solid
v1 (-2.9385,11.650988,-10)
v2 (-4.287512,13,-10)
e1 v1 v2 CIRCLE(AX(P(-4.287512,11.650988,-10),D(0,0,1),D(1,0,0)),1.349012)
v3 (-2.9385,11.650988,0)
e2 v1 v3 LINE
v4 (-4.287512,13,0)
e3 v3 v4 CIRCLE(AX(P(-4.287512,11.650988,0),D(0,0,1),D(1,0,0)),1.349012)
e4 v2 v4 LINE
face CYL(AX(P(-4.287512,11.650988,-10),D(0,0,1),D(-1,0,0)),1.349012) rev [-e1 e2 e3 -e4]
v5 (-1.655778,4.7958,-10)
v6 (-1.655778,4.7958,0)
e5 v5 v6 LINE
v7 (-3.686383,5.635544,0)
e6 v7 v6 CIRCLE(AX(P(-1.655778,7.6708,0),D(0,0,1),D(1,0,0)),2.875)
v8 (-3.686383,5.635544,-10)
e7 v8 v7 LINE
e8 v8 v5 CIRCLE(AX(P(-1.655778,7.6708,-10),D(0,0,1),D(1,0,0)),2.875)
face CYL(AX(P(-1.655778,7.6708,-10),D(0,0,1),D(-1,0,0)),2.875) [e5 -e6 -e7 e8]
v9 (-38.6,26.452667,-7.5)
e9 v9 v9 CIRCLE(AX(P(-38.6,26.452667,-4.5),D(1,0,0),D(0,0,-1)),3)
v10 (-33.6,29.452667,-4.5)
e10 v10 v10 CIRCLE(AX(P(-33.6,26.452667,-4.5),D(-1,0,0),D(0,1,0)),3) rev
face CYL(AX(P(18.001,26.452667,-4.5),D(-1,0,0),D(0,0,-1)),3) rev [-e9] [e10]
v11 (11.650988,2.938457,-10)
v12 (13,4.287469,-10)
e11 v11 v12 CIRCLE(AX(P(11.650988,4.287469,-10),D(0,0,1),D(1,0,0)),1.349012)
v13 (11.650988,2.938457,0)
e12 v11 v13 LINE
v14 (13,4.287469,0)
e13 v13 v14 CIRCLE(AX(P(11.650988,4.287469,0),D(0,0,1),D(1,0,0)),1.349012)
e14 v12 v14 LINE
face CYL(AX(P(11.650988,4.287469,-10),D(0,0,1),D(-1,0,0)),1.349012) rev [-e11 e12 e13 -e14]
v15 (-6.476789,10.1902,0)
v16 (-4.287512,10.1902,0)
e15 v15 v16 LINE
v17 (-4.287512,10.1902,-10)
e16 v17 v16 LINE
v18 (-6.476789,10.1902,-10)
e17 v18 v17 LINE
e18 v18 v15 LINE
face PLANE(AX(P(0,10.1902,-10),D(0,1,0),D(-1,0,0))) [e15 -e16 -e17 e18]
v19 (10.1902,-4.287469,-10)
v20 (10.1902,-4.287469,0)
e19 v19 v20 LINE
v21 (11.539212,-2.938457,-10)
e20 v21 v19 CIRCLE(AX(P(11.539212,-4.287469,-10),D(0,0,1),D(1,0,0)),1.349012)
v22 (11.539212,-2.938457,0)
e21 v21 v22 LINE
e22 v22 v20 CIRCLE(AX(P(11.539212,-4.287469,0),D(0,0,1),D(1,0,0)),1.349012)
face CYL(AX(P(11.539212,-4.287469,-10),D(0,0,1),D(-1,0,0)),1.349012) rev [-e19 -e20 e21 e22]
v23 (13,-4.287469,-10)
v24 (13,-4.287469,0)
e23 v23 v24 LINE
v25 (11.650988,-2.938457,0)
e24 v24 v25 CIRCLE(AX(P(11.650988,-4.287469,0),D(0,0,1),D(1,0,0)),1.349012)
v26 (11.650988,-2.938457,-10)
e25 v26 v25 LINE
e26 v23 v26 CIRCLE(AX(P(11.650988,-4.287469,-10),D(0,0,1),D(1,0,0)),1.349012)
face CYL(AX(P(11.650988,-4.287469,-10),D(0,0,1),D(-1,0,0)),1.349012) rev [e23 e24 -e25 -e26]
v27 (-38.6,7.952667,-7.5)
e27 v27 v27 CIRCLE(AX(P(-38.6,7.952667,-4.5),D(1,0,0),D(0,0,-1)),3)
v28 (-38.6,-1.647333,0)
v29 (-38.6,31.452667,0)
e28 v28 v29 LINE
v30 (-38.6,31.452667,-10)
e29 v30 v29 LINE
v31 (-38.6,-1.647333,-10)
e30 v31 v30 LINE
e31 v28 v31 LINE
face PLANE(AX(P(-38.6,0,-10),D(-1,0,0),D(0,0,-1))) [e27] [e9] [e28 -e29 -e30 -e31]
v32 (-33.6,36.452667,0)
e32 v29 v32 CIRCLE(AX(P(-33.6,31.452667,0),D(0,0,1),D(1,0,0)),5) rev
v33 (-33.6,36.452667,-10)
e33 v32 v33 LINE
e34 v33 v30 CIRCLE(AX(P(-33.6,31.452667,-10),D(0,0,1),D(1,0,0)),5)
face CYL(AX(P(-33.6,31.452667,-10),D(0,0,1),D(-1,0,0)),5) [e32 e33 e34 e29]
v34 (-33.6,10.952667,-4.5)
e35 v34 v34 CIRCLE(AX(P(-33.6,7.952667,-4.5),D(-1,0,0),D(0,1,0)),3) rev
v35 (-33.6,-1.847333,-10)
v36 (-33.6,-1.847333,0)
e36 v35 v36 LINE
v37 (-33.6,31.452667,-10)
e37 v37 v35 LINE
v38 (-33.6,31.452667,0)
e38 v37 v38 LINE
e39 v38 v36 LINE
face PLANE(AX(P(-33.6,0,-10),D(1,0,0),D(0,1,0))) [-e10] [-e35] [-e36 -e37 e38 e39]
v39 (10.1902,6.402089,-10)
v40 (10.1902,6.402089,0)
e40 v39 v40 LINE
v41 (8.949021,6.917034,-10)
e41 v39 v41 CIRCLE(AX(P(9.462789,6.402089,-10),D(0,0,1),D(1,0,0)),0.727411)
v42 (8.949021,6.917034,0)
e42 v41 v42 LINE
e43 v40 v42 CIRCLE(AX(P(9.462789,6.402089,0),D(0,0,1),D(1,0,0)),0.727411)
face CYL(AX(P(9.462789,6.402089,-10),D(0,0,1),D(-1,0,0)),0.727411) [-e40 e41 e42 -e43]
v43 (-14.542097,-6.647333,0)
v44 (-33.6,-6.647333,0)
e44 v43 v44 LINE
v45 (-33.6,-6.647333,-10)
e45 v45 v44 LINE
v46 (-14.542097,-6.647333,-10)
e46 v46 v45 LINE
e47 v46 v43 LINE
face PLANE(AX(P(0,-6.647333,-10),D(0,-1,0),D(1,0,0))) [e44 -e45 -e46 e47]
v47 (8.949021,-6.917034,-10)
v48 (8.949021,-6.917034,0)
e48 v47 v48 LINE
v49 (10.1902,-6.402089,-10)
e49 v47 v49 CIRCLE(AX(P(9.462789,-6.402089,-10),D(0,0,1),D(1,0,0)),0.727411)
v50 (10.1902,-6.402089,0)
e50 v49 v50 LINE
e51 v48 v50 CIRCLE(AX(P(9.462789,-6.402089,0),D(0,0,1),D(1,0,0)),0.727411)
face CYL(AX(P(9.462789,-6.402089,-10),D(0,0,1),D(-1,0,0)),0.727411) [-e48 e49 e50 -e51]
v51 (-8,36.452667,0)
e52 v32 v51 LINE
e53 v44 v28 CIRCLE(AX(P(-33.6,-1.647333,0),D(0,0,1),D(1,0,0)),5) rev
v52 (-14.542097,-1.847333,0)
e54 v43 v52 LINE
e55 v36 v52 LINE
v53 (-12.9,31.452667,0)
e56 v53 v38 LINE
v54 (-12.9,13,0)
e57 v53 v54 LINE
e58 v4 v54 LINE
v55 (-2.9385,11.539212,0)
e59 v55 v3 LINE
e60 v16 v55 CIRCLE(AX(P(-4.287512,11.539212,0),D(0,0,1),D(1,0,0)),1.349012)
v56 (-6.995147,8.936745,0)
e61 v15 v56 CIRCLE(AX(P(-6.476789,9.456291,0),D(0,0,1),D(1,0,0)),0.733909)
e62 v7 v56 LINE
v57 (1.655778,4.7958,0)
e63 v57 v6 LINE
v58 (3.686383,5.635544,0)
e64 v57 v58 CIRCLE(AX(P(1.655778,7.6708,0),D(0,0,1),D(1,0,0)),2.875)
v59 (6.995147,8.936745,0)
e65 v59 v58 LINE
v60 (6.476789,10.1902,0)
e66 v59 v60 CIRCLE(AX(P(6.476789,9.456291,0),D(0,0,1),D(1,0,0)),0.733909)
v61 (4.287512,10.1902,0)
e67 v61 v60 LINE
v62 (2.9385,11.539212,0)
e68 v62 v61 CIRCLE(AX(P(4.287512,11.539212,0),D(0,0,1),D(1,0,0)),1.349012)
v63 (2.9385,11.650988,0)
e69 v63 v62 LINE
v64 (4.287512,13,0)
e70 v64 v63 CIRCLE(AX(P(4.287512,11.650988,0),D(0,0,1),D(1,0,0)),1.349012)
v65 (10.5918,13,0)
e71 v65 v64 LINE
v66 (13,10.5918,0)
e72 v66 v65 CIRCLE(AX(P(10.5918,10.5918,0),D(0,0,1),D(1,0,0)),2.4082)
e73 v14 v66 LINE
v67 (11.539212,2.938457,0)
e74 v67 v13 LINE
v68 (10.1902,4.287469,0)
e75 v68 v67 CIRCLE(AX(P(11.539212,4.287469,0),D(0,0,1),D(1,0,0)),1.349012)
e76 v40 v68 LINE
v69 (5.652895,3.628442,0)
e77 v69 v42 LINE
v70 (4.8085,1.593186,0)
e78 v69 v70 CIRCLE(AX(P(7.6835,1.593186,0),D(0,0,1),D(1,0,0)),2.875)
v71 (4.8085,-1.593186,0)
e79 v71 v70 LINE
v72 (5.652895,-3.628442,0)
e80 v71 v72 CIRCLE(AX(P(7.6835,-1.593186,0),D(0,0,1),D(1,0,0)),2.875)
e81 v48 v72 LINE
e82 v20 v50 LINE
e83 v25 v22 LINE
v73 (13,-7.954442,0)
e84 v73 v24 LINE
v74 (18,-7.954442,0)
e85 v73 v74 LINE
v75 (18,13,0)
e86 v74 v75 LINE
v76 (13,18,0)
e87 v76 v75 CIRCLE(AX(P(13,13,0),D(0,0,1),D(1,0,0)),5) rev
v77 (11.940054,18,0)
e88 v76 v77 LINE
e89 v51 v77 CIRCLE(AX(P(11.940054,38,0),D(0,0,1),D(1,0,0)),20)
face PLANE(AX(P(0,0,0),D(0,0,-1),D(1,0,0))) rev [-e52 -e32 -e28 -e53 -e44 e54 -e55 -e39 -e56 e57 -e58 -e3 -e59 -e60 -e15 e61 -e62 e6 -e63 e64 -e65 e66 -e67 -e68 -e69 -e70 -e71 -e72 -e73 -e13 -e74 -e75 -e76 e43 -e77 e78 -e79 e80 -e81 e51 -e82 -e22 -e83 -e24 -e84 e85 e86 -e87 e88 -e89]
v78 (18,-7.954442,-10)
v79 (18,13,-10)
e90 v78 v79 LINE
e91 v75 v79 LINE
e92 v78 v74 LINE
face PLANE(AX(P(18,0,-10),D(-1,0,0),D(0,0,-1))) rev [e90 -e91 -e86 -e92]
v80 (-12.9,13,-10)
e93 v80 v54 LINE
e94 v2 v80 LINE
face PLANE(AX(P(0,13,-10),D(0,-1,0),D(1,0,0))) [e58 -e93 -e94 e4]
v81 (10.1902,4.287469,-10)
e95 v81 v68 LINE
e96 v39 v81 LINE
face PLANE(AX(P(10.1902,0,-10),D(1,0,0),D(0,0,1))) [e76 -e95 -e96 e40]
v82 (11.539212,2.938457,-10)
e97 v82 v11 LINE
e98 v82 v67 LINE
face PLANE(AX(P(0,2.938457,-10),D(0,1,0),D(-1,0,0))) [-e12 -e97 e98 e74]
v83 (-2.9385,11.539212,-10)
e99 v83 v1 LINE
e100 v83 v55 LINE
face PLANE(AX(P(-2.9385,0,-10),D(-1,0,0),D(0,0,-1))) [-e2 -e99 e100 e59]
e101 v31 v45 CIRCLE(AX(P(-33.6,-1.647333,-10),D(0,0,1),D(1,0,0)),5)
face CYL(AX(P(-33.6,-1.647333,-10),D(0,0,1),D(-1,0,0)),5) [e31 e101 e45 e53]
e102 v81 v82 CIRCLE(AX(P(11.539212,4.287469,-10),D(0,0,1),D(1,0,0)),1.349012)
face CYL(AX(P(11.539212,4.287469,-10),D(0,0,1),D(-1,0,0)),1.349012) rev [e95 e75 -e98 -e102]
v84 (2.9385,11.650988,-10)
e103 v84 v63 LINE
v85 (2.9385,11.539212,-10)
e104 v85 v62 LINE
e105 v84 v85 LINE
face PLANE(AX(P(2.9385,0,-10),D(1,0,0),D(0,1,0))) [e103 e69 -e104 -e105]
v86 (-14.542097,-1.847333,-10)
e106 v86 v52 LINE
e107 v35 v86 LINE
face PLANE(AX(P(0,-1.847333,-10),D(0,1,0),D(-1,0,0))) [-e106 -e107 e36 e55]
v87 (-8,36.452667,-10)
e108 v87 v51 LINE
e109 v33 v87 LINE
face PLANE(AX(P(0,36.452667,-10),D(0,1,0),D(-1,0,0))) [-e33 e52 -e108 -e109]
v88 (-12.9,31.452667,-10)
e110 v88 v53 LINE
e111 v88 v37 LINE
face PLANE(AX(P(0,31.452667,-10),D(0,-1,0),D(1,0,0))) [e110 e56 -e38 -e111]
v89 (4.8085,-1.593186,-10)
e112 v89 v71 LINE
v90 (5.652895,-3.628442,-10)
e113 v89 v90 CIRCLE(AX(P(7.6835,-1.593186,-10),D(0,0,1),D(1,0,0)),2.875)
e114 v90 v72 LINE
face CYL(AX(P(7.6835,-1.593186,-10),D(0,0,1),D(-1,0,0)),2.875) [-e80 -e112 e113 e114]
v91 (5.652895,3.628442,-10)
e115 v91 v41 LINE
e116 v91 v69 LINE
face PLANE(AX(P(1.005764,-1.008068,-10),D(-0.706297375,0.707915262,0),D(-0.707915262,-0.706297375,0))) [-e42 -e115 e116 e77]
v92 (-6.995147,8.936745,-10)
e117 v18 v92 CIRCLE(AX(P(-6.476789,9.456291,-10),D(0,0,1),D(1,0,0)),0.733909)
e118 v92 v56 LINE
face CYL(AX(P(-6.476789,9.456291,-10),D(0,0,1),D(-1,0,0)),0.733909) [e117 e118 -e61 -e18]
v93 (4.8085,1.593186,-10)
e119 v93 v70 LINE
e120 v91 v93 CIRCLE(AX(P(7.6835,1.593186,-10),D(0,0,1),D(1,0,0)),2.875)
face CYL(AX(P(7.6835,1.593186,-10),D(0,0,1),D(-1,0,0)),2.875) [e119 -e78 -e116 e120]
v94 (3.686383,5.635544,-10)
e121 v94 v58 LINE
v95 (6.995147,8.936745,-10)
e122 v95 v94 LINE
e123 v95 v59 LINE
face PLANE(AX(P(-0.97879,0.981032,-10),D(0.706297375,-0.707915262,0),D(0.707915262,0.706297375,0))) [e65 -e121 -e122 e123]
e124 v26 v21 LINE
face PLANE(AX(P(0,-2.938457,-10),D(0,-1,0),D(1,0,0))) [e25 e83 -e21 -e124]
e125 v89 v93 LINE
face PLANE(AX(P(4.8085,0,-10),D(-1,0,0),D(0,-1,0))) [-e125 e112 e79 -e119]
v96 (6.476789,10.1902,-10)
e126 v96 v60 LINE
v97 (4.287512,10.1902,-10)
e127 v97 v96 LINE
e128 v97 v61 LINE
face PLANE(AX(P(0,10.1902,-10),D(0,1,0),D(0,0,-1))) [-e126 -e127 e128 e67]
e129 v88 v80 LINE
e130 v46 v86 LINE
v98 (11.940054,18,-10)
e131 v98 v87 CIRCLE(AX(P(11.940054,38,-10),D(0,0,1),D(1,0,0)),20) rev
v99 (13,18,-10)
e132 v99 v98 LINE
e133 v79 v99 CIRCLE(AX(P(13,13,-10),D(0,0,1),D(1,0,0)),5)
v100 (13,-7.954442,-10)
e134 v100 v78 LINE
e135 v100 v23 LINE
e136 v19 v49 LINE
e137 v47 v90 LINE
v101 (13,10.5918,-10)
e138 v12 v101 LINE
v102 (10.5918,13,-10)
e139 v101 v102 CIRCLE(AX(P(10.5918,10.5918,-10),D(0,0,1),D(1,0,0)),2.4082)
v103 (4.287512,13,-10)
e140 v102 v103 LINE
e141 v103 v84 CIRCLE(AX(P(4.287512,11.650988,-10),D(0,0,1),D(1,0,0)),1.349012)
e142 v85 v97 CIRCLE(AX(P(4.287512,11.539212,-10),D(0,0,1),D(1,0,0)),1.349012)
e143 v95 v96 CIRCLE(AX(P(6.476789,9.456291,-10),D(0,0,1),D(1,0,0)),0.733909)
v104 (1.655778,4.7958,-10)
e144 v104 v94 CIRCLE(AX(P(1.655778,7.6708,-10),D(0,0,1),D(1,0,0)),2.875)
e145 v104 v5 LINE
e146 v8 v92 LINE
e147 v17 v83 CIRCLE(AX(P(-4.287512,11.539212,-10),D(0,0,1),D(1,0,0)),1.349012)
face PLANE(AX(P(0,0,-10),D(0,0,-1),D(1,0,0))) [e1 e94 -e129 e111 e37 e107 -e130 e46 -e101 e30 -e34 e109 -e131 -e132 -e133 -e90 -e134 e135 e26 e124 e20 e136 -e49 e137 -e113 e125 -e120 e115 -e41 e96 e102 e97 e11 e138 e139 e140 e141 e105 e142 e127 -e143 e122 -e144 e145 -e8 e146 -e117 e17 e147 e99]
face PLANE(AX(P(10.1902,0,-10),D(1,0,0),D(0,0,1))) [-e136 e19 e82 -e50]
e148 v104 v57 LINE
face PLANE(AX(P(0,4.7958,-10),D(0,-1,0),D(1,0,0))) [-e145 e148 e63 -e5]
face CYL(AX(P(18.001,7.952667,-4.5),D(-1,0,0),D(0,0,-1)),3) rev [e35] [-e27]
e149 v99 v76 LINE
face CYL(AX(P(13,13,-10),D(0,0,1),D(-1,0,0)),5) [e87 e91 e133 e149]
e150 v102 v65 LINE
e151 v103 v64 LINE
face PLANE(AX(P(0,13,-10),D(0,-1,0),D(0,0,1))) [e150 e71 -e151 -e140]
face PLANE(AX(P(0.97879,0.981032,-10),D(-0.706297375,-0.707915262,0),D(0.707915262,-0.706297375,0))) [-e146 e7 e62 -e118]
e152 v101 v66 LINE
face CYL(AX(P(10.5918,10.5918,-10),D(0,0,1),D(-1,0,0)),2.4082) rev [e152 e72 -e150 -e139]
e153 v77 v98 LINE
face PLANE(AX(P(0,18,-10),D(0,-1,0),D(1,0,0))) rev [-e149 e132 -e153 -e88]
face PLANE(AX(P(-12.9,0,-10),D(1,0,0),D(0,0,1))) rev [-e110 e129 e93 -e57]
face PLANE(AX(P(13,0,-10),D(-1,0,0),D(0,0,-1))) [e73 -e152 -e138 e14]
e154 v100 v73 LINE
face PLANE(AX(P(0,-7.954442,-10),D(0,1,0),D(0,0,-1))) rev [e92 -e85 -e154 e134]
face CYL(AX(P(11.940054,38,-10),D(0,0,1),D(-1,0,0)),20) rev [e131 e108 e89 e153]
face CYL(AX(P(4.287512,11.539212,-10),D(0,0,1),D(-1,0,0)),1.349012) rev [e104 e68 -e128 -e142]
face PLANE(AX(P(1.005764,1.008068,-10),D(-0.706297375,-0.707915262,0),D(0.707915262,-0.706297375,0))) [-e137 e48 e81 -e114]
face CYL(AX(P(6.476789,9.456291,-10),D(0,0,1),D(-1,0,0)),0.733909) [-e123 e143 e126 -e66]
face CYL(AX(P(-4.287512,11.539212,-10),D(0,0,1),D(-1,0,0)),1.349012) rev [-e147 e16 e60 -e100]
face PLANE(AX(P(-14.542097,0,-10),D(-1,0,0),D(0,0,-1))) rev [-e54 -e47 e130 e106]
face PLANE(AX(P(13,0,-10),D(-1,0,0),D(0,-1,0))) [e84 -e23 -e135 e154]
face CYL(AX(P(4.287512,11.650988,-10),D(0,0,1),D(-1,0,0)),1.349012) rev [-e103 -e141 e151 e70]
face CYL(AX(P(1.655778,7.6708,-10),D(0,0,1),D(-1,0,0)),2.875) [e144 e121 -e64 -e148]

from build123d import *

# Parameters (mm, degrees)
BOSS_EXTRUDE1_DEPTH = 10
CUT_EXTRUDE1_REACH  = 70.061
SKETCH2_R           = 3
FILLET1_R           = 20
FILLET2_R           = 5
SKETCH3_W           = 29.852045942
SKETCH3_H           = 84.66747525
CUT_EXTRUDE2_DEPTH  = 125


with BuildPart() as part:
    # Sketch1 → Boss-Extrude1 (new body)
    with BuildSketch(Plane.XY):
        with BuildLine():
            Line((13, -5.3170836), (13, -7.9544418))
            Line((13, -7.9544418), (18, -7.9544418))
            Line((18, -7.9544418), (18, 18))
            Line((18, 18), (-8, 18))
            Line((-8, 18), (-8, 36.4526666))
            Line((-8, 36.4526666), (-38.6, 36.4526666))
            Line((-38.6, 36.4526666), (-38.6, -6.6473334))
            Line((-38.6, -6.6473334), (-18, -6.6473334))
            Line((-18, -6.6473334), (-14.542097223, -6.6473334))
            Line((-14.542097223, -6.6473334), (-14.542097223, -1.8473334))
            Line((-14.542097223, -1.8473334), (-33.6, -1.8473334))
            Line((-33.6, -1.8473334), (-33.6, 31.4526666))
            Line((-33.6, 31.4526666), (-12.9, 31.4526666))
            Line((-12.9, 31.4526666), (-12.9, 13))
            Line((-12.9, 13), (-4.305880552, 13))
            Line((-4.305880552, 13), (-4.287512407, 13))
            ThreePointArc((-4.287512407, 13), (-3.333616586, 12.604883414), (-2.9385, 11.650987593))
            Line((-2.9385, 11.650987593), (-2.9385, 11.539212407))
            ThreePointArc((-2.9385, 11.539212407), (-3.333616586, 10.585316586), (-4.287512407, 10.1902))
            Line((-4.287512407, 10.1902), (-6.476788598, 10.1902))
            ThreePointArc((-6.476788598, 10.1902), (-7.154992901, 9.736757749), (-6.995146796, 8.93674514))
            Line((-6.995146796, 8.93674514), (-3.686383353, 5.635543623))
            ThreePointArc((-3.686383353, 5.635543623), (-2.754473742, 5.014017446), (-1.655778399, 4.7958))
            Line((-1.655778399, 4.7958), (1.655778399, 4.7958))
            ThreePointArc((1.655778399, 4.7958), (2.754473742, 5.014017446), (3.686383353, 5.635543623))
            Line((3.686383353, 5.635543623), (6.995146796, 8.93674514))
            ThreePointArc((6.995146796, 8.93674514), (7.154992901, 9.736757749), (6.476788598, 10.1902))
            Line((6.476788598, 10.1902), (4.287512407, 10.1902))
            ThreePointArc((4.287512407, 10.1902), (3.333616586, 10.585316586), (2.9385, 11.539212407))
            Line((2.9385, 11.539212407), (2.9385, 11.650987593))
            ThreePointArc((2.9385, 11.650987593), (3.333616586, 12.604883414), (4.287512407, 13))
            Line((4.287512407, 13), (5.321597603, 13))
            Line((5.321597603, 13), (10.5918, 13))
            ThreePointArc((10.5918, 13), (12.29465455, 12.29465455), (13, 10.5918))
            Line((13, 10.5918), (13, 7.9544418))
            Line((13, 7.9544418), (13, 5.3170836))
            Line((13, 5.3170836), (13, 4.287469289))
            ThreePointArc((13, 4.287469289), (12.604883414, 3.333573468), (11.650987593, 2.938456882))
            Line((11.650987593, 2.938456882), (11.539212407, 2.938456882))
            ThreePointArc((11.539212407, 2.938456882), (10.585316586, 3.333573468), (10.1902, 4.287469289))
            Line((10.1902, 4.287469289), (10.1902, 6.402089023))
            ThreePointArc((10.1902, 6.402089023), (9.74154152, 7.073969797), (8.94902056, 6.917034355))
            Line((8.94902056, 6.917034355), (5.652895046, 3.628441884))
            ThreePointArc((5.652895046, 3.628441884), (5.027976112, 2.694919539), (4.8085, 1.593185507))
            Line((4.8085, 1.593185507), (4.8085, -1.593185507))
            ThreePointArc((4.8085, -1.593185507), (5.027976112, -2.694919539), (5.652895046, -3.628441884))
            Line((5.652895046, -3.628441884), (8.94902056, -6.917034355))
            ThreePointArc((8.94902056, -6.917034355), (9.74154152, -7.073969797), (10.1902, -6.402089023))
            Line((10.1902, -6.402089023), (10.1902, -4.287469289))
            ThreePointArc((10.1902, -4.287469289), (10.585316586, -3.333573468), (11.539212407, -2.938456882))
            Line((11.539212407, -2.938456882), (11.650987593, -2.938456882))
            ThreePointArc((11.650987593, -2.938456882), (12.604883414, -3.333573468), (13, -4.287469289))
            Line((13, -4.287469289), (13, -5.3170836))
        make_face()
    extrude(amount=BOSS_EXTRUDE1_DEPTH)

    # Sketch2 → Cut-Extrude1 (cut, up to next)
    with BuildSketch(Plane.ZY.offset(38.6), mode=Mode.PRIVATE) as cut_extrude1_sk1:
        with Locations((4.5, 26.4526666)):
            Circle(SKETCH2_R)
    cut_extrude1_tool1 = extrude(cut_extrude1_sk1.sketch, amount=-CUT_EXTRUDE1_REACH, mode=Mode.PRIVATE) & part.part
    # Sketch2 → Cut-Extrude1 (cut, up to next)
    with BuildSketch(Plane.ZY.offset(38.6), mode=Mode.PRIVATE) as cut_extrude1_sk2:
        with Locations((4.5, 7.9526666)):
            Circle(SKETCH2_R)
    cut_extrude1_tool2 = extrude(cut_extrude1_sk2.sketch, amount=-CUT_EXTRUDE1_REACH, mode=Mode.PRIVATE) & part.part
    add(cut_extrude1_tool1.solids().sort_by_distance((-38.6, 26.452667, 4.5))[0], mode=Mode.SUBTRACT)
    add(cut_extrude1_tool2.solids().sort_by_distance((-38.6, 7.952667, 4.5))[0], mode=Mode.SUBTRACT)

    # Fillet1
    # the kernel refuses this fillet: 20 mm, written as the material it adds along each edge
    with BuildSketch(Plane(origin=(-8, 18, 0), x_dir=(1, 0, 0), z_dir=(0, 0, 1))) as fillet1_piece_1:
        with BuildLine():
            CenterArc((19.940054146, 20), FILLET1_R, 184.437217766, 85.562782234)
            Line((0, 18.4526666), (-0.398801083, 18.421719932))
            ThreePointArc((-0.398801083, 18.421719932), (-0.4, 9.2263333), (-0.4, 0))
            Line((-0.4, 0), (0, -0.4))
            Line((0, -0.4), (19.940054146, -0.4))
            Line((19.940054146, -0.4), (19.940054146, 0))
        make_face()
    extrude(amount=10)

    # Fillet2
    fillet2_edges = [part.edges().sort_by_distance(p)[0] for p in [
        (-38.6, -6.6473334, 5),
        (-38.6, 36.4526666, 5),
        (18, 18, 5),
    ]]
    fillet(fillet2_edges, radius=FILLET2_R)


with BuildPart() as body_2:
    # Mirror1: mirrored copy
    add(part.part.mirror(Plane.XY))


with BuildPart() as part_1:
    add(part.part)

    # Sketch3 → Cut-Extrude2 (cut)
    with BuildSketch(Plane.ZY.offset(38.6)):
        with Locations((14.926022971, 7.66612184)):
            Rectangle(SKETCH3_W, SKETCH3_H)
    extrude(amount=-CUT_EXTRUDE2_DEPTH, mode=Mode.SUBTRACT)


solid = body_2.part
